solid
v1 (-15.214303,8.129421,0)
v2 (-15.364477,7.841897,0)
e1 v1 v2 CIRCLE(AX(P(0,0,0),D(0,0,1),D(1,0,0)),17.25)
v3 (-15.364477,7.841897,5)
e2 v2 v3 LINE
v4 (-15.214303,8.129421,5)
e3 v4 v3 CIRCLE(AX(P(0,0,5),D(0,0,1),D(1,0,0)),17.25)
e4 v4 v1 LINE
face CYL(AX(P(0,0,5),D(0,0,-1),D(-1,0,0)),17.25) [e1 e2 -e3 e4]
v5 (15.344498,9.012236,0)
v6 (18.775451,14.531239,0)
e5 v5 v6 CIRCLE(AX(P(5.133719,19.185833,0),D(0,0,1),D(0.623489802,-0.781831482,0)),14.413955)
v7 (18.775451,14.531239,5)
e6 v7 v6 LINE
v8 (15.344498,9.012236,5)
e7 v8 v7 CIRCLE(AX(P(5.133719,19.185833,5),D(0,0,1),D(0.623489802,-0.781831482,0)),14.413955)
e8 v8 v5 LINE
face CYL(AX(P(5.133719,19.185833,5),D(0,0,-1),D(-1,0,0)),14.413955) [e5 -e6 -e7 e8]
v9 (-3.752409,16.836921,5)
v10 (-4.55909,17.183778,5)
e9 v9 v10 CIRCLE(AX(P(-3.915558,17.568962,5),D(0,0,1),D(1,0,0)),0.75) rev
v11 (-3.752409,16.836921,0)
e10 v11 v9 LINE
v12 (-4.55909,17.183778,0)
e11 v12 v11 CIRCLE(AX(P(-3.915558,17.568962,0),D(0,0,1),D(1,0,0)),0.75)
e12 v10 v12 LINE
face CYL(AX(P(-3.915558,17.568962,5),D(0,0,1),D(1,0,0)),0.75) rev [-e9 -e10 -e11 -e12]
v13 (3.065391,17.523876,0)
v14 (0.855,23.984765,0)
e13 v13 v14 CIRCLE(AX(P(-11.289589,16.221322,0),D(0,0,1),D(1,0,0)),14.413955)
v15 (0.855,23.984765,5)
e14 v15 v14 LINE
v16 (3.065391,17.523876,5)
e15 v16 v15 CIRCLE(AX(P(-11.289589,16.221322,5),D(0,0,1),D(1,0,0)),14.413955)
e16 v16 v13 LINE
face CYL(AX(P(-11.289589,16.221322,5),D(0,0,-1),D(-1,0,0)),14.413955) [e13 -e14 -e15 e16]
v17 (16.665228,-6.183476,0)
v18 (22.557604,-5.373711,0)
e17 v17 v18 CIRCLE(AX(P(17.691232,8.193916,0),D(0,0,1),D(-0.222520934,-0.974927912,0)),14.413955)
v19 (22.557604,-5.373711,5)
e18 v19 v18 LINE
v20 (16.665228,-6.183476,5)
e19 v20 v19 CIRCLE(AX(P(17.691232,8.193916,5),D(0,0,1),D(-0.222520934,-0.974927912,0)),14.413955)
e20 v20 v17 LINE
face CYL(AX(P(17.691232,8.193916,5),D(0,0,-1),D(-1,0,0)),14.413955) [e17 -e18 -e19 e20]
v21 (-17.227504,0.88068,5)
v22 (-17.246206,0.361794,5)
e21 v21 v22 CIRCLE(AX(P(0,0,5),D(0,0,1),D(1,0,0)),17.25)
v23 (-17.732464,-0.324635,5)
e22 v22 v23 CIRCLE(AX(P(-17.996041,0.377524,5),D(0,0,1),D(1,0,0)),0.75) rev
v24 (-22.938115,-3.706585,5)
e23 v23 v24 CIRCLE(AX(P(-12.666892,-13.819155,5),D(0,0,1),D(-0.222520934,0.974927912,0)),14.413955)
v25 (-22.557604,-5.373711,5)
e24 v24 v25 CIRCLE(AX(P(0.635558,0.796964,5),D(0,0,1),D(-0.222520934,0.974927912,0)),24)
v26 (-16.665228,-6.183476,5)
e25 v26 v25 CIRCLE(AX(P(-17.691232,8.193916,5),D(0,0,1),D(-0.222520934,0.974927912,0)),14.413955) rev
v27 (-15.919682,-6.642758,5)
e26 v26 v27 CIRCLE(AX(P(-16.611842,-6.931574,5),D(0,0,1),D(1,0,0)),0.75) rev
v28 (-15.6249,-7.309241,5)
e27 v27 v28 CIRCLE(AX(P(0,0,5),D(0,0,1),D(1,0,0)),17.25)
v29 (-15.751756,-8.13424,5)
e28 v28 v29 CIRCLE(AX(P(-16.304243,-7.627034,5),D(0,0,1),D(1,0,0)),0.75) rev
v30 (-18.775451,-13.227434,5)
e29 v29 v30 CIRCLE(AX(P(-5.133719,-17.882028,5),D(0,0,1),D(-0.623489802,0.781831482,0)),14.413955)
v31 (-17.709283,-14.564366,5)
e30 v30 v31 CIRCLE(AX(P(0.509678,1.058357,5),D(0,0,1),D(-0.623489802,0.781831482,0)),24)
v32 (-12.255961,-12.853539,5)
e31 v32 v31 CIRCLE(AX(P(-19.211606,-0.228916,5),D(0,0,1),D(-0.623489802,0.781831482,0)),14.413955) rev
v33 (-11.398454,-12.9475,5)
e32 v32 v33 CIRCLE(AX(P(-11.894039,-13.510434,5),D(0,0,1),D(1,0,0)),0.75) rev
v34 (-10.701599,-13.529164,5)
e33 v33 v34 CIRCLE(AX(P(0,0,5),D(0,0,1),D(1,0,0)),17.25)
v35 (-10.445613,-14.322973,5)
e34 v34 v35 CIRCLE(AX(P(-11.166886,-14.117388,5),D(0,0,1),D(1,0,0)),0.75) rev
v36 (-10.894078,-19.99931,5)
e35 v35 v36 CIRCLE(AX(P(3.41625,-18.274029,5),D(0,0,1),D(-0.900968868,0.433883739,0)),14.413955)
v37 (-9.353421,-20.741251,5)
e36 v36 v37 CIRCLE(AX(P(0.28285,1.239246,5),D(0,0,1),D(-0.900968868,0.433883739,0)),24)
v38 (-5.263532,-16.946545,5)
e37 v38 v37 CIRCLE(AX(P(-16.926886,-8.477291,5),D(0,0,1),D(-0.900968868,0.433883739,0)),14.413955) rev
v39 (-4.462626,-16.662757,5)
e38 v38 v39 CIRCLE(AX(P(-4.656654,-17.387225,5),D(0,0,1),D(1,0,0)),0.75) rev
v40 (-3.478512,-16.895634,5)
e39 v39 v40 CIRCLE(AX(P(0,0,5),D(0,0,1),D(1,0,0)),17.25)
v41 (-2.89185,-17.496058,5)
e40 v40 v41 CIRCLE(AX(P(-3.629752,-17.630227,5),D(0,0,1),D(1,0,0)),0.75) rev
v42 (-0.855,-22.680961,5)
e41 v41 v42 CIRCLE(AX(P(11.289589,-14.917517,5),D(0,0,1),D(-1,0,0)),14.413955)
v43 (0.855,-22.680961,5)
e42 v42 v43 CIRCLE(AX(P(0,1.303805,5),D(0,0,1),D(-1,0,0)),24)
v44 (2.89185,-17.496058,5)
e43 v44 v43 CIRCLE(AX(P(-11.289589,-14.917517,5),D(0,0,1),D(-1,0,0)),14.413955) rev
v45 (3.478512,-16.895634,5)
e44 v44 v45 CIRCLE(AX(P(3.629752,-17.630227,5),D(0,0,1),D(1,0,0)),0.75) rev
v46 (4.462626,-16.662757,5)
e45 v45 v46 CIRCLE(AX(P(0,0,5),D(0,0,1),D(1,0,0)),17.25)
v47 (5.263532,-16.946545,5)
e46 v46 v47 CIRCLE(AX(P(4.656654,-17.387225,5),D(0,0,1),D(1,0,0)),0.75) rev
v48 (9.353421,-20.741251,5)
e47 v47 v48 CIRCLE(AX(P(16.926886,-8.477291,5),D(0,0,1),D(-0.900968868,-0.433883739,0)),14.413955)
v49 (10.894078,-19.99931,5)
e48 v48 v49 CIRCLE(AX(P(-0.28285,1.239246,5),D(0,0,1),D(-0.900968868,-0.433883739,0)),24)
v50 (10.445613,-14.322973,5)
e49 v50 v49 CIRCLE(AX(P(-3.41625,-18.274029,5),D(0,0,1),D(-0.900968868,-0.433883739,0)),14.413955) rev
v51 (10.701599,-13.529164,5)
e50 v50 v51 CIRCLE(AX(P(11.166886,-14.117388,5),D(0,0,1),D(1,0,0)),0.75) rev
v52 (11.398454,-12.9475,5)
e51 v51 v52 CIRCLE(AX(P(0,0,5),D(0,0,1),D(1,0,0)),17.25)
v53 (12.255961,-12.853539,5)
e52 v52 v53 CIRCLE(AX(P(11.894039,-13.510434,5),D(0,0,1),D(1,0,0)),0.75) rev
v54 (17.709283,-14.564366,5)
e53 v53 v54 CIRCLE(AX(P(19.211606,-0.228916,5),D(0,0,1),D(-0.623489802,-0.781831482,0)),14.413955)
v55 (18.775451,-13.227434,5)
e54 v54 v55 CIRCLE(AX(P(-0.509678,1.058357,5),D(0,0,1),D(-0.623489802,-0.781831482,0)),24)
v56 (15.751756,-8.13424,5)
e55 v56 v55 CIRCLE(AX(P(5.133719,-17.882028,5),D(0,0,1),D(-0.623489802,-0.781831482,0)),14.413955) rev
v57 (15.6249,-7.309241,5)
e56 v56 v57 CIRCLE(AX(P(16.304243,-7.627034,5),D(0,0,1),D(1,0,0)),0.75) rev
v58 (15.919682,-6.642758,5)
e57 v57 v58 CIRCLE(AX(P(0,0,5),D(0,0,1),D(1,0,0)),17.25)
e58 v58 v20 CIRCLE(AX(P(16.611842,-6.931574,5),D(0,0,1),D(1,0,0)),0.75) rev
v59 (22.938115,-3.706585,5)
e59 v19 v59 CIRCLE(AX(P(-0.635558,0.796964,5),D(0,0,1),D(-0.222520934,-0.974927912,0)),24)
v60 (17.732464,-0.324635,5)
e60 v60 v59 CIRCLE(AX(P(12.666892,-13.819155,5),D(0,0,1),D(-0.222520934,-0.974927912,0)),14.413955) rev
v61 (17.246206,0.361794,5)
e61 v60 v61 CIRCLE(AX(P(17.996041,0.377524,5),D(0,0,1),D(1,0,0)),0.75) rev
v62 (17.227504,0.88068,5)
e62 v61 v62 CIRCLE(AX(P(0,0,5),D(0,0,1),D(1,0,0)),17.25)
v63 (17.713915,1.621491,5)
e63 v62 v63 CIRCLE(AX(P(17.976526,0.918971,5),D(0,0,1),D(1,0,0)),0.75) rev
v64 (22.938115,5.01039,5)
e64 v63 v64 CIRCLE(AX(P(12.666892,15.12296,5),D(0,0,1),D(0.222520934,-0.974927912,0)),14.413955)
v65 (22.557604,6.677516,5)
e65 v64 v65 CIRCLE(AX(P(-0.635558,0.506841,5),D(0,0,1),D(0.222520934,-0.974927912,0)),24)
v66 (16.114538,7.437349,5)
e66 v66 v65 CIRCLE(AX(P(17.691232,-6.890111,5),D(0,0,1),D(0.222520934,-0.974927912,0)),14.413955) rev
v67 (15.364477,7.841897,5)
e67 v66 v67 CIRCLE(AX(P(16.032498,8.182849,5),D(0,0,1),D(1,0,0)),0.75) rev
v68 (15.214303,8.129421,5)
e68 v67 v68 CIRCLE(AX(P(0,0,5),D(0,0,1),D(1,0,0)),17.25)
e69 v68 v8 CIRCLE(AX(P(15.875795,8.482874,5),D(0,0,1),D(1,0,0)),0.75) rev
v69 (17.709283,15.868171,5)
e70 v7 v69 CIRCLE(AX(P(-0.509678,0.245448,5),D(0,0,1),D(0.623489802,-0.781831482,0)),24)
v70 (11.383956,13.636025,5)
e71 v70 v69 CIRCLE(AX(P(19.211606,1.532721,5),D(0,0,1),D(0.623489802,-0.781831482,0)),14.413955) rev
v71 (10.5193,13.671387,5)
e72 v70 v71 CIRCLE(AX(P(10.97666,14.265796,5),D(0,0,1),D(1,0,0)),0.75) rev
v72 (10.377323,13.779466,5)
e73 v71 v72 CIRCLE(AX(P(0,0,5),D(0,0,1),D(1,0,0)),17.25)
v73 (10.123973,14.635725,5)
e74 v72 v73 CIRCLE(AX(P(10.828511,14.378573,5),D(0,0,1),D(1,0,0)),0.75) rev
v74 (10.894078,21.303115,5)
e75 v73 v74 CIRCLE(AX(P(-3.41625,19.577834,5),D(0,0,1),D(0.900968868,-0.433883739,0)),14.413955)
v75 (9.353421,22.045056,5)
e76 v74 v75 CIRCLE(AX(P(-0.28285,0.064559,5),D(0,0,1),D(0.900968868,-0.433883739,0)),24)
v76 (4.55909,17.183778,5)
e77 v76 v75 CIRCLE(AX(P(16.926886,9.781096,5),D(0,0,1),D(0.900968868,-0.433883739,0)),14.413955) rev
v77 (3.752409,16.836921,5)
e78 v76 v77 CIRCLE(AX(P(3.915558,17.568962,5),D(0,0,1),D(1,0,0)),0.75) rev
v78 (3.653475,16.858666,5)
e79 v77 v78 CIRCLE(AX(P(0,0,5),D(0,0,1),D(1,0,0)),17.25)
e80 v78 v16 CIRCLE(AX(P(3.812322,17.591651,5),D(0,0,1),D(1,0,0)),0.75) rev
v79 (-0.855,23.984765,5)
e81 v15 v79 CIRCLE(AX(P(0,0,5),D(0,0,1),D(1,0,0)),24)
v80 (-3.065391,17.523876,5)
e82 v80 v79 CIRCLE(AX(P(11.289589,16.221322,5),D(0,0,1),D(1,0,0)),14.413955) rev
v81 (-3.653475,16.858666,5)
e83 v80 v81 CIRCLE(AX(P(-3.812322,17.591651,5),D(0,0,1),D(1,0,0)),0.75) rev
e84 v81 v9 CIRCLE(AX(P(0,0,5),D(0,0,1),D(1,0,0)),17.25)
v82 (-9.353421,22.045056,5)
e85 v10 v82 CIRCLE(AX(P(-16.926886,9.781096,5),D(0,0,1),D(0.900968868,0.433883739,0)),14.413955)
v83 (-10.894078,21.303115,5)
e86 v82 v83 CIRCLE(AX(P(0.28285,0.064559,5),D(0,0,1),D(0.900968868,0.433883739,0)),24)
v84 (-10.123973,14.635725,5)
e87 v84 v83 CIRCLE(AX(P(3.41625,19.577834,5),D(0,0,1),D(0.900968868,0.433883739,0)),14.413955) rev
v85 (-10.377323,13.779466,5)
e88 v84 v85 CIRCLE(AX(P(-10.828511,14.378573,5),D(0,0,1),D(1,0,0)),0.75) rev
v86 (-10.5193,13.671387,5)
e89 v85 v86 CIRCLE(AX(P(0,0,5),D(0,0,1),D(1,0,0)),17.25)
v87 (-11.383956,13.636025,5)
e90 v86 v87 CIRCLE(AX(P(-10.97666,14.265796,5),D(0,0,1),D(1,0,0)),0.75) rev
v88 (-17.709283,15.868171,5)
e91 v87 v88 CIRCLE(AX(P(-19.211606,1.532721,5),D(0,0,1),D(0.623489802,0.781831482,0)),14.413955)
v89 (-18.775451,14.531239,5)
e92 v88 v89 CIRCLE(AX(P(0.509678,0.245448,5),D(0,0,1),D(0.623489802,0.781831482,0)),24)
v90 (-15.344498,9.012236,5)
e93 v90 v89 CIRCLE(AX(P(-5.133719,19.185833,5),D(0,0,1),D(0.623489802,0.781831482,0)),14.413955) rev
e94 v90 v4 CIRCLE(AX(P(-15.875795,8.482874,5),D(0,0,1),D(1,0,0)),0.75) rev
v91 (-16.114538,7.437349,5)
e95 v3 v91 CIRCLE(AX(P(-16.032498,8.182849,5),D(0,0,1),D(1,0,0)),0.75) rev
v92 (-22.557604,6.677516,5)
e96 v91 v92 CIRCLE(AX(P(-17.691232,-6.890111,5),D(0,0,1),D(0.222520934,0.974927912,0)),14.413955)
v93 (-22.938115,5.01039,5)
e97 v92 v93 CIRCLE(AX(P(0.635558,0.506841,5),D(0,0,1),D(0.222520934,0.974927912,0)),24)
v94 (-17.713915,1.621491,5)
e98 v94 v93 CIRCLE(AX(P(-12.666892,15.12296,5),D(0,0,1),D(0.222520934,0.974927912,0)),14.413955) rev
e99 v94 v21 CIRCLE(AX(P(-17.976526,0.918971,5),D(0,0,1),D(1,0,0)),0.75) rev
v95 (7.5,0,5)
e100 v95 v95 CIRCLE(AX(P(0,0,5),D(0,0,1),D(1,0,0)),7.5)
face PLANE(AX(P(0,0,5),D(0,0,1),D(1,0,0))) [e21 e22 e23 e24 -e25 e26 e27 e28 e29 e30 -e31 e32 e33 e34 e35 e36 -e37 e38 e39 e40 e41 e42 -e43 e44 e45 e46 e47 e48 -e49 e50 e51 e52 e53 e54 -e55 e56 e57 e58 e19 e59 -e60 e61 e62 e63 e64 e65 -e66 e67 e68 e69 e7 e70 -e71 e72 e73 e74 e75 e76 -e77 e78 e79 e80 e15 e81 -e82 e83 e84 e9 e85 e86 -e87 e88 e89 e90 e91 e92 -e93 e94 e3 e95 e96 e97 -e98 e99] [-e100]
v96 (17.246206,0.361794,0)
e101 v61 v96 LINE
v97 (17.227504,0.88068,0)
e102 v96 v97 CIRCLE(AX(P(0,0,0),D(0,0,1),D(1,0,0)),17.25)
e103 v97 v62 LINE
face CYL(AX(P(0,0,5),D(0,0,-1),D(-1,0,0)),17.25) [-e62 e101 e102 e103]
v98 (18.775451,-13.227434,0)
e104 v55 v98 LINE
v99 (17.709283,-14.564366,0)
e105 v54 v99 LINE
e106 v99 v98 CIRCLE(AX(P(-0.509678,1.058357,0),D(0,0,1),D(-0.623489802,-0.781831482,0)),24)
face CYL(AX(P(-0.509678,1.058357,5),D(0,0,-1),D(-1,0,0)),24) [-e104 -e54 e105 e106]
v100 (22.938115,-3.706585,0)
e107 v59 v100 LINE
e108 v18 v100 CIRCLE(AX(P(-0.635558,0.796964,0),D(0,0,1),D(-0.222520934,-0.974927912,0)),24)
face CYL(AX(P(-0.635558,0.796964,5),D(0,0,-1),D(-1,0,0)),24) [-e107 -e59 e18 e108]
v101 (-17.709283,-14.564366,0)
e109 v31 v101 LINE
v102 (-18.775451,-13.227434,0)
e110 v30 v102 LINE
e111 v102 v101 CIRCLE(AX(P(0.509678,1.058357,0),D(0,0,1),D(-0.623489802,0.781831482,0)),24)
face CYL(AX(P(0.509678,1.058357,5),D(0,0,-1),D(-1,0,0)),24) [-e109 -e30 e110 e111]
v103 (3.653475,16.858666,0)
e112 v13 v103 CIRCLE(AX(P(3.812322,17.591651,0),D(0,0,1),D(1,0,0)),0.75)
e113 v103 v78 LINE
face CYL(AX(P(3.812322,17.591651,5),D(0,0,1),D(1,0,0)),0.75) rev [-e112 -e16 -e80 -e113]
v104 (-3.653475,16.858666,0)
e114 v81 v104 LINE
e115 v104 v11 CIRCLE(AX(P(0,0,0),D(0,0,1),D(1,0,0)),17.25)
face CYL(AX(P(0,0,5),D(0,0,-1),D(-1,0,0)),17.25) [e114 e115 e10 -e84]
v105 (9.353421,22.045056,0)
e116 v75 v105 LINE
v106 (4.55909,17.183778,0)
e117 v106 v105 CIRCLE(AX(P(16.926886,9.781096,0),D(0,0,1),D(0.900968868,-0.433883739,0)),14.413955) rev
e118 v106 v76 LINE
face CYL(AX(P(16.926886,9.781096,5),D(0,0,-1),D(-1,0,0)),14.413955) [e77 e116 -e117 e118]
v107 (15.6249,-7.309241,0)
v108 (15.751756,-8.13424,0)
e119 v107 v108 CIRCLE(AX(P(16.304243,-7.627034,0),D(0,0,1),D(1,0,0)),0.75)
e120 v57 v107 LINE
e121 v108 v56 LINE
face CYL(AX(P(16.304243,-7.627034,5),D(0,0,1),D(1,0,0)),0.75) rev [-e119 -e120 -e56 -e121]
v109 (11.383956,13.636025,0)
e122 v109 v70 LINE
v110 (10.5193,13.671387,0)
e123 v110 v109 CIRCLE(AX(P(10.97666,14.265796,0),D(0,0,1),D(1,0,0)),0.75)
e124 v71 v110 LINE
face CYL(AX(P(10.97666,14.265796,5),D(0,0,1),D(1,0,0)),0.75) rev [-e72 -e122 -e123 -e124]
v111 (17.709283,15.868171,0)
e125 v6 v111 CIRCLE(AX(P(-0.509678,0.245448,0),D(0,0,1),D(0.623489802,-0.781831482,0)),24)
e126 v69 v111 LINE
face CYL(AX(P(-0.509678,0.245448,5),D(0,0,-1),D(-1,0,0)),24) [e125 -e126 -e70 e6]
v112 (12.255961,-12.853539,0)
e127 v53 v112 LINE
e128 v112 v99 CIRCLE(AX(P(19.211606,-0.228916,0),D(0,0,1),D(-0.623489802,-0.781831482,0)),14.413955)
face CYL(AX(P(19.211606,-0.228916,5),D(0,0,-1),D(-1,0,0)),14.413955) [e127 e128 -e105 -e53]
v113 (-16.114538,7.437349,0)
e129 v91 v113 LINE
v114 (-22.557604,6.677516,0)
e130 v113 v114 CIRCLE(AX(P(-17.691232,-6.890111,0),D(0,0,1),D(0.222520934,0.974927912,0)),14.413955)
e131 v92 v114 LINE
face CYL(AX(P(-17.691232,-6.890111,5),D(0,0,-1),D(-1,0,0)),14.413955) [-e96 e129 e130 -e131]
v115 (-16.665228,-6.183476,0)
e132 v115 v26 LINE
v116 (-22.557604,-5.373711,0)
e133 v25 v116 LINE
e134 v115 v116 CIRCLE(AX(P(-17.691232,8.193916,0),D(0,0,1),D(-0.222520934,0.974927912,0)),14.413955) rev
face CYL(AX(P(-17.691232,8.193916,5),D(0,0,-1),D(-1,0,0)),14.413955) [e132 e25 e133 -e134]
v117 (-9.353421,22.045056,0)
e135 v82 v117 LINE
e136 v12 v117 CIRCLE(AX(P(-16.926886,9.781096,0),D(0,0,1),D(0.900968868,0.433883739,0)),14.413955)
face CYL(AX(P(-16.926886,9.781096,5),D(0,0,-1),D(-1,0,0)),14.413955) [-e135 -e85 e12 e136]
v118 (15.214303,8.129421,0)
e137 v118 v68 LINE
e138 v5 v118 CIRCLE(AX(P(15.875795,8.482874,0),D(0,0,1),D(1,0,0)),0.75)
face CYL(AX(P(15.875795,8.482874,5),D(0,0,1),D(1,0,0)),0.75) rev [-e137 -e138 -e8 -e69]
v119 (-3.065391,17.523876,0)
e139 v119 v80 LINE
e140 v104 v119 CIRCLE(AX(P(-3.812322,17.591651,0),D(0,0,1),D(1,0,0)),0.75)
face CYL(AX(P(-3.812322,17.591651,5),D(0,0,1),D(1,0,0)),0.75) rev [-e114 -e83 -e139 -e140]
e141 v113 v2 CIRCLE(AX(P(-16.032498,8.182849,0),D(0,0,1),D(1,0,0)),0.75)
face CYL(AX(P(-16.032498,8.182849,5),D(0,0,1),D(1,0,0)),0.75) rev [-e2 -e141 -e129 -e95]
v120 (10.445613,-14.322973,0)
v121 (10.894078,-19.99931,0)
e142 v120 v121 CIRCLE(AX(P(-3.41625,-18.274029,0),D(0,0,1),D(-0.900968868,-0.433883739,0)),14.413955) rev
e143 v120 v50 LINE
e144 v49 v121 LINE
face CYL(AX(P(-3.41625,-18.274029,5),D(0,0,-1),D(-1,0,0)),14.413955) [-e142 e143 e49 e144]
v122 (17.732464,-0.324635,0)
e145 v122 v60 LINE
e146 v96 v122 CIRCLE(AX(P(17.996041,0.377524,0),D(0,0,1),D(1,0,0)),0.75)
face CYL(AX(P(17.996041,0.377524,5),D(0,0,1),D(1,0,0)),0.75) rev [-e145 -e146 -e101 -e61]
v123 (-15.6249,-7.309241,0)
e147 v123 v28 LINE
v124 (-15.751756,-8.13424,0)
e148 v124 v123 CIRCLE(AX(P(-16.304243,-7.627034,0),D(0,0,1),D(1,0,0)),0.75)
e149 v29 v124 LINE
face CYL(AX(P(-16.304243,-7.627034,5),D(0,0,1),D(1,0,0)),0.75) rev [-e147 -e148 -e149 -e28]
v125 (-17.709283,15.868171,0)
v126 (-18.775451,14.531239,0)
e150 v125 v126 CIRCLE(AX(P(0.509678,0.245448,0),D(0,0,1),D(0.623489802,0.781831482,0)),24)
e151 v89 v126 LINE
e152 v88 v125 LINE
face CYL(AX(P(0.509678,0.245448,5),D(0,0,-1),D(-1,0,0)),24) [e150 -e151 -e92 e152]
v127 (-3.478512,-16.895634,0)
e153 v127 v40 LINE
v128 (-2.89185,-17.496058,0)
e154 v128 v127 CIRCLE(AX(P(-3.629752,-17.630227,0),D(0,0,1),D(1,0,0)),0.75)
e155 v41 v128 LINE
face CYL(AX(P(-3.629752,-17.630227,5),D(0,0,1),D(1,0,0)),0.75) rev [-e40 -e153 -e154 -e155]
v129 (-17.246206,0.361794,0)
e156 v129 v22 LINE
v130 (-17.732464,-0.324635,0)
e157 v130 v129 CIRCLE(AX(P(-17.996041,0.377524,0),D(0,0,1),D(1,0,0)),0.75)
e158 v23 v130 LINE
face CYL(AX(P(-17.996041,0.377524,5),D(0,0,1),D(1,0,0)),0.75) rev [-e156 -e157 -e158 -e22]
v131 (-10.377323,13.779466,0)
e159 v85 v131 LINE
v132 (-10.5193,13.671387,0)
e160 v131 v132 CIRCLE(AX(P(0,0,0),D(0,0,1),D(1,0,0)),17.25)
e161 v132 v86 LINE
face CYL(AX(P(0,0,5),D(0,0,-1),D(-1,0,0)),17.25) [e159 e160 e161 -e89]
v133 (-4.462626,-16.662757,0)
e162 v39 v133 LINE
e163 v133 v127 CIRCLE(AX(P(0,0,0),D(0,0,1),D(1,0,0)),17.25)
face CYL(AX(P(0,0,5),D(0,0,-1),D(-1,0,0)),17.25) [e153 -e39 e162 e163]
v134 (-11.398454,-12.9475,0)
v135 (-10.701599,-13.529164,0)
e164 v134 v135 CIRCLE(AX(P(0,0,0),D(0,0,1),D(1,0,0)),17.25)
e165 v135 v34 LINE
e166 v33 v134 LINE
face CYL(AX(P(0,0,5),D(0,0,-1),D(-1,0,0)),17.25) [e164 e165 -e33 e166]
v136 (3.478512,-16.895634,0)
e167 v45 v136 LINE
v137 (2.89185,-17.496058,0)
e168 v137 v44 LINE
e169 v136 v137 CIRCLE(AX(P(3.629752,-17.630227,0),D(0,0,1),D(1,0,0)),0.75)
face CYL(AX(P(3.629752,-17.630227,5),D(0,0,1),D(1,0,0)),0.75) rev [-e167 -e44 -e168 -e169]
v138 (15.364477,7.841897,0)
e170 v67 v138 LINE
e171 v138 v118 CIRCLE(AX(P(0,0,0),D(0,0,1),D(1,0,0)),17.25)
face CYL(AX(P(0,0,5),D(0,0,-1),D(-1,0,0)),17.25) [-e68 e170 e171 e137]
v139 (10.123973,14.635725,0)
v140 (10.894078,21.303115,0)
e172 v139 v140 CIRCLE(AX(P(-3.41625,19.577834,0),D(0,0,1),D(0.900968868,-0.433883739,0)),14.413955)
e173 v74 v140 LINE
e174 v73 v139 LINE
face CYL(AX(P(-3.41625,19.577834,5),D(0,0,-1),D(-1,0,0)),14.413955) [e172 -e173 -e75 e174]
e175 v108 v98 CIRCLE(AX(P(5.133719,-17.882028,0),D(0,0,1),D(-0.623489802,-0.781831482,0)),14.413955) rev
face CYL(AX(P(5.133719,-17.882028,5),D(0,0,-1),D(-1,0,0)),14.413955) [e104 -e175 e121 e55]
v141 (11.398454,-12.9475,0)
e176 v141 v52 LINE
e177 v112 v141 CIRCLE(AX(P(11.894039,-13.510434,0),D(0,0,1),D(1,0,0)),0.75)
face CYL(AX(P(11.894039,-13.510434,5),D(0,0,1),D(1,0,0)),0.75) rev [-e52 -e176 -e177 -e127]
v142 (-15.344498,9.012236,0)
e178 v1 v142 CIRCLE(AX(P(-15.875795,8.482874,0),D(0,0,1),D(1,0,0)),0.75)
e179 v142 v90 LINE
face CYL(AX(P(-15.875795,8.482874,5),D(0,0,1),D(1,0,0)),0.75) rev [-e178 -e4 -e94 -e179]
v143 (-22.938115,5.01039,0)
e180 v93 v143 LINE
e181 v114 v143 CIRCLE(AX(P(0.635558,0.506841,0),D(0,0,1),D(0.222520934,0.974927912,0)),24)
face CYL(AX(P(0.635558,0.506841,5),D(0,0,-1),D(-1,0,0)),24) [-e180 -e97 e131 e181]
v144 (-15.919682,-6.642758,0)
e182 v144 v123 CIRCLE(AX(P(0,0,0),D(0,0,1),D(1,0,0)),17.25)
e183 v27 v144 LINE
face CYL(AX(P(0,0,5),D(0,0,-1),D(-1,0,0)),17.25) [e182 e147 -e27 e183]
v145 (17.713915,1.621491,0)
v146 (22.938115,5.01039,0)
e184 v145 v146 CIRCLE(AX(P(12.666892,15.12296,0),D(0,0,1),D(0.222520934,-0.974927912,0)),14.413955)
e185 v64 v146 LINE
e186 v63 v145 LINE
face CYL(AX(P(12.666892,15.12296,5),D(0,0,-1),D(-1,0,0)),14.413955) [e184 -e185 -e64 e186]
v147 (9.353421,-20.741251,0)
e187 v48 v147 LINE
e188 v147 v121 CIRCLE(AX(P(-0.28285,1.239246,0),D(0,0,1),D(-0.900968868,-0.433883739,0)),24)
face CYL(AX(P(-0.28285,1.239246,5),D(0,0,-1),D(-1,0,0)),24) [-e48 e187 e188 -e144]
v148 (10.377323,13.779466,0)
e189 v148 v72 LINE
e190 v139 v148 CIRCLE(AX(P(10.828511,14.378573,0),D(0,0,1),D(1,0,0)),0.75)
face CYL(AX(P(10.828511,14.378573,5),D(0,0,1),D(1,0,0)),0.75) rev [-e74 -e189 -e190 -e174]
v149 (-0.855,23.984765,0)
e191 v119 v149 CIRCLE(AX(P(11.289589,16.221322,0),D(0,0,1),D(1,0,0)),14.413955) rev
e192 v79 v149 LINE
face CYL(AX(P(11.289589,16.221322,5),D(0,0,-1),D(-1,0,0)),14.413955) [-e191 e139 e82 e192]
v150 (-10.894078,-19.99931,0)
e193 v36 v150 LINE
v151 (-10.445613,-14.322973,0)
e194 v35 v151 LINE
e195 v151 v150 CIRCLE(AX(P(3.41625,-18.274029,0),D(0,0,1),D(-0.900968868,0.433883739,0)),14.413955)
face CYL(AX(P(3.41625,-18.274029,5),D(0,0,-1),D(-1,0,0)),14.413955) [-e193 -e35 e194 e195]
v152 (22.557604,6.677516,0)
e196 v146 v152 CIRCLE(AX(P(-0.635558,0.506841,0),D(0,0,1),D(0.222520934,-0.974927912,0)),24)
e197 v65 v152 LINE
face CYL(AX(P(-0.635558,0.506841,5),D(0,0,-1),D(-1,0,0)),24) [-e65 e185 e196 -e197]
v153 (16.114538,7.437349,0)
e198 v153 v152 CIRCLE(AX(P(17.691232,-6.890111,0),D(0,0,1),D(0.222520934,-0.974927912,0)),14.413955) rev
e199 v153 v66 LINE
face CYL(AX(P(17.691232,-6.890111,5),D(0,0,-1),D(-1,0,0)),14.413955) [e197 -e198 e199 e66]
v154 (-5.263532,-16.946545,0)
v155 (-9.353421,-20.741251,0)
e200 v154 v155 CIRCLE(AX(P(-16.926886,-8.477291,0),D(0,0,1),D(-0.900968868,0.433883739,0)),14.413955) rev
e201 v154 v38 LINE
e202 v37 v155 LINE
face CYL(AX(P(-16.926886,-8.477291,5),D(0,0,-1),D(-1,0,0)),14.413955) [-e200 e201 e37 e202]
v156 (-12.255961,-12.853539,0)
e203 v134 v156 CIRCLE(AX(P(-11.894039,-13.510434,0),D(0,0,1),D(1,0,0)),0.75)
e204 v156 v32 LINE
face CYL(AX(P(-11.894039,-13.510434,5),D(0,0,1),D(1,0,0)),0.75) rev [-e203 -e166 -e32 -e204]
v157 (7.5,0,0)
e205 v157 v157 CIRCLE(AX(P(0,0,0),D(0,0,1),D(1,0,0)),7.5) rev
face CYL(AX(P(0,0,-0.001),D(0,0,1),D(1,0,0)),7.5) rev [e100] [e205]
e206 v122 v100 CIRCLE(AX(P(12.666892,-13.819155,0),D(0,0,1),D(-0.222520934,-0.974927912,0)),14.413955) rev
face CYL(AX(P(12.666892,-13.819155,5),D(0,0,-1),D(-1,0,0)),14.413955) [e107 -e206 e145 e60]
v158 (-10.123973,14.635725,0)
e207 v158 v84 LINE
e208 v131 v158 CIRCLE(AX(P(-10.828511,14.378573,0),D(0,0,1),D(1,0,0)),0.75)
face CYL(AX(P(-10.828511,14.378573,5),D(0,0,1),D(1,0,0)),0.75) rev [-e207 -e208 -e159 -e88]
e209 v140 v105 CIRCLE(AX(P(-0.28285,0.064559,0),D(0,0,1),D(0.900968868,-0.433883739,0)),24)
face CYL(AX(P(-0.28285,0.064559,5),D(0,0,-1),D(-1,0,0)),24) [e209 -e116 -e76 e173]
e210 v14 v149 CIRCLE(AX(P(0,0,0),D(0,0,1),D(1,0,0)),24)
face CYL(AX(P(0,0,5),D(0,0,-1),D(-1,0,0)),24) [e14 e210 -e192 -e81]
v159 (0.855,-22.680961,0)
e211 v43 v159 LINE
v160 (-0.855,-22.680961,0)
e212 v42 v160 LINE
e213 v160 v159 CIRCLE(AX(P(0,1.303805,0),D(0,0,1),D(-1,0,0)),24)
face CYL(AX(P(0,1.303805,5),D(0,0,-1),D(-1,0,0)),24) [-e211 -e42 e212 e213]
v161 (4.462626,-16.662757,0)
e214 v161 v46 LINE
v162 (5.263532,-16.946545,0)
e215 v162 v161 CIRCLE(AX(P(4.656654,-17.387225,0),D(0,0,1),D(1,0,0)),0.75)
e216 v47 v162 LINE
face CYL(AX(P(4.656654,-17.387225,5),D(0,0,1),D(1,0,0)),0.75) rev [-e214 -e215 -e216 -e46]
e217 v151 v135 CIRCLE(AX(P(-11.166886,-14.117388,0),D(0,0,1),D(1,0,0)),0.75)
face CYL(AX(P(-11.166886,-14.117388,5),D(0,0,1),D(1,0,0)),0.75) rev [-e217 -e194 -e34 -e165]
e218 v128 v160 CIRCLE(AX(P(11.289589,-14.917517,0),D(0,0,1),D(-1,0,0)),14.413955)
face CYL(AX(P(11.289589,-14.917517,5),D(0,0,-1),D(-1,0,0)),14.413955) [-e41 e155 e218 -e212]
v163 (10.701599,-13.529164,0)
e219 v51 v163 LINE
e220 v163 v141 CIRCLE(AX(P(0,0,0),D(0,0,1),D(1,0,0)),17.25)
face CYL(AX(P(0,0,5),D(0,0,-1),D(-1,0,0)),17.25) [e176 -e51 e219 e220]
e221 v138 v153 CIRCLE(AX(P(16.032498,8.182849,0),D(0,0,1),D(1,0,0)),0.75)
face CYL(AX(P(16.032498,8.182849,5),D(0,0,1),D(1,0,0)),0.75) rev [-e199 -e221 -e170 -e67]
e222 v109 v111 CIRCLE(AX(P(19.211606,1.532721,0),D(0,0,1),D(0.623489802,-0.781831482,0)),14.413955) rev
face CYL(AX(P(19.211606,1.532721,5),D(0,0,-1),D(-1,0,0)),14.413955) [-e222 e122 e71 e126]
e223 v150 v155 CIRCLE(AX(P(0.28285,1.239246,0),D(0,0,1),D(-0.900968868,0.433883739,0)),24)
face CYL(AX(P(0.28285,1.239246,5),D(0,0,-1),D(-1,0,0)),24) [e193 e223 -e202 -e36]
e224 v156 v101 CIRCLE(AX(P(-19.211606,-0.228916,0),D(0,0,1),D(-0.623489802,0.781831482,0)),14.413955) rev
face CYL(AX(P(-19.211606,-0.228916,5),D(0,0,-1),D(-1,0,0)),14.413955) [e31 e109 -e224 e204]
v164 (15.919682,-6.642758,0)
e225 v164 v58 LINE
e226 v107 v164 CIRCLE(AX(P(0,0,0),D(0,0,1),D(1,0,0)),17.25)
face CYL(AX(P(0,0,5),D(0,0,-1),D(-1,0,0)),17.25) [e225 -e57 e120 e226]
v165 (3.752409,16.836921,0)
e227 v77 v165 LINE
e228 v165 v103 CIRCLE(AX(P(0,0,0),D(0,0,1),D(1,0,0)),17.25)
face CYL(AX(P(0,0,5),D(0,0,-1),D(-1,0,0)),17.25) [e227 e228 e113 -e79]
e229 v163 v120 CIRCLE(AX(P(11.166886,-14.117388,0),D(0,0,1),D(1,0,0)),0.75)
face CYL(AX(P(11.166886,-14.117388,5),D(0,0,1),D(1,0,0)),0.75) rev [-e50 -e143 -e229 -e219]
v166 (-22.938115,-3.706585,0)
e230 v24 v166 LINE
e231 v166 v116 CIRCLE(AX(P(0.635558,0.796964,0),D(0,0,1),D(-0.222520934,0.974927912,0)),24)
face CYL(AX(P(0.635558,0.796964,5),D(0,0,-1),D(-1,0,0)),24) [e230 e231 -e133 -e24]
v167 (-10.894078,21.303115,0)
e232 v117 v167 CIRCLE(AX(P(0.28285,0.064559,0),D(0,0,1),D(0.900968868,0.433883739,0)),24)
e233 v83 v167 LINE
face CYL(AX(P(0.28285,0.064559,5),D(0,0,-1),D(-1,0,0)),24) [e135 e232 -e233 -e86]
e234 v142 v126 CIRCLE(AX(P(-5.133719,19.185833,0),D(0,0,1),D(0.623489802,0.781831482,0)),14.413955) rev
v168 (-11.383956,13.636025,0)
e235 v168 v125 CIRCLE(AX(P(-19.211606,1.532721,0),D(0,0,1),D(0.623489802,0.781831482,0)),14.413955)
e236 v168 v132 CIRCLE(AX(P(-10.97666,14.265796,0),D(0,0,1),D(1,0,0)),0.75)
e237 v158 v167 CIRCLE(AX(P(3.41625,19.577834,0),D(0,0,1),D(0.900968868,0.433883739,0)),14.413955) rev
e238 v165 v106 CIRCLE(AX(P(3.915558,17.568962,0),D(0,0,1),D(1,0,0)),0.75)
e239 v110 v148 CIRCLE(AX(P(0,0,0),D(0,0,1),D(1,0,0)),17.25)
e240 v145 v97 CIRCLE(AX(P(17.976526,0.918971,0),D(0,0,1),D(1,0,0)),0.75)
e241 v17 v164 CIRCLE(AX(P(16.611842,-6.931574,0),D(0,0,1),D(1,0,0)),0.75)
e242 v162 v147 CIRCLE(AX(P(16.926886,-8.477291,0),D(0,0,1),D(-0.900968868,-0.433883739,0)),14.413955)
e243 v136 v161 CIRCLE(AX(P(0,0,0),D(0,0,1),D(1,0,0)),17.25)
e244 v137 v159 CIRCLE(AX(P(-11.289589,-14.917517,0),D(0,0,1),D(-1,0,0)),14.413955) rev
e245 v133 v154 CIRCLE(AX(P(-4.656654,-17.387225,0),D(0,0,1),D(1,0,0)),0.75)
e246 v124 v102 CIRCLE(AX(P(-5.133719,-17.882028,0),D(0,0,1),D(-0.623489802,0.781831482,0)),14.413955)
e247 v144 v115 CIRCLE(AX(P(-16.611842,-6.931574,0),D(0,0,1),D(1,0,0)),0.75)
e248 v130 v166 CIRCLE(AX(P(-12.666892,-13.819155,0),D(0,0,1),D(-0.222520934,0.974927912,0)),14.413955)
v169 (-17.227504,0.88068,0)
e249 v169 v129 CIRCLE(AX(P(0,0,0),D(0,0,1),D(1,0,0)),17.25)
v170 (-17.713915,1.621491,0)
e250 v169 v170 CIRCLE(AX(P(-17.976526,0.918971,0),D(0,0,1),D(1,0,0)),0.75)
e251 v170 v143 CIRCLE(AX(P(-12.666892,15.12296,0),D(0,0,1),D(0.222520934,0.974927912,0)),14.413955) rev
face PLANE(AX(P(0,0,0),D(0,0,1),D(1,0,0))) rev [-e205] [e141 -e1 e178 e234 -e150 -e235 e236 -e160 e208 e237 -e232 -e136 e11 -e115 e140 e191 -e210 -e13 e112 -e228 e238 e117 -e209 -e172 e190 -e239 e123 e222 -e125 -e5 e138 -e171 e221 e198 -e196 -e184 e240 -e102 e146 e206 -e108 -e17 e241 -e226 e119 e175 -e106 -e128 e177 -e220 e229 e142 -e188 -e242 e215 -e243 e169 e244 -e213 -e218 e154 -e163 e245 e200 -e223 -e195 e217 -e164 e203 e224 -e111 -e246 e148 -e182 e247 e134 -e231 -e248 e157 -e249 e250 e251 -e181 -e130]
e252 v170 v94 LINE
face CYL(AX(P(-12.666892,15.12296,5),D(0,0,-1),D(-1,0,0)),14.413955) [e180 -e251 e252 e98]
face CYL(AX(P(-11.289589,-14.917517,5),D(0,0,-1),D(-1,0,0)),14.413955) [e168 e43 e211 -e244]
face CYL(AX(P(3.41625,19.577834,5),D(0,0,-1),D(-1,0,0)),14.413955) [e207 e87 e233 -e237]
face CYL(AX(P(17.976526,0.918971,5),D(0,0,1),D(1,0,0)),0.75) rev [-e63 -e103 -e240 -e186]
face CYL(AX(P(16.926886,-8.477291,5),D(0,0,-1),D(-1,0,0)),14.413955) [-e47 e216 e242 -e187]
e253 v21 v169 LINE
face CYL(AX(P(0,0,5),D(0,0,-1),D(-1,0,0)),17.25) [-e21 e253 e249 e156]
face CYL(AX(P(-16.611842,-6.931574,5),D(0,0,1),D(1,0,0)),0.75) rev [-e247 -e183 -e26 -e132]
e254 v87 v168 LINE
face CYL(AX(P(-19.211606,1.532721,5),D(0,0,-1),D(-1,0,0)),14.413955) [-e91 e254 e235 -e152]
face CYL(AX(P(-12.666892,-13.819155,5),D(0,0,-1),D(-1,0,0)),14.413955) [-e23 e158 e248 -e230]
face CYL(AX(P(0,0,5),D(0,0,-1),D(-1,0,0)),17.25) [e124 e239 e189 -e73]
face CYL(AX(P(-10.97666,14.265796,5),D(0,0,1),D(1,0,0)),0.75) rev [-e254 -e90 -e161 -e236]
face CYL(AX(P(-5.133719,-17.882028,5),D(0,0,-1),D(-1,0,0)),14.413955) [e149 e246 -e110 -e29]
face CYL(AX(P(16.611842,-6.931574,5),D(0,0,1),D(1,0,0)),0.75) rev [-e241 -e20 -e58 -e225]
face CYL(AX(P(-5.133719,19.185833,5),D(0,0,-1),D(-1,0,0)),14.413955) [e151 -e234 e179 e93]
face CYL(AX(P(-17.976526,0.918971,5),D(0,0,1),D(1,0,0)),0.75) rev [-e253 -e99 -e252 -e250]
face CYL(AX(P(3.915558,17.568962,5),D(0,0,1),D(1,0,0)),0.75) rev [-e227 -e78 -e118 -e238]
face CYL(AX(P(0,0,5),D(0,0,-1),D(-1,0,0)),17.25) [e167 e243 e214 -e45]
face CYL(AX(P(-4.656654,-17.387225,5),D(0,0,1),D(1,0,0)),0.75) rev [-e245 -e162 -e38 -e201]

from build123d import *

# Parameters (mm, degrees)
SKETCH_1_R               = 17.25
EXTRUDE_1_DEPTH          = 5
EXTRUDE_2_DEPTH          = 5
FILLET_1_R               = 0.75
PATTERN_CIRCULAR_1_DEPTH = 5
CUT_EXTRUDE_2_REACH      = 35.573
SKETCH_2_R               = 7.5


# Read off the part's stored shape, not the designer's step: 원형 패턴1
with BuildPart() as part:
    # 스케치1 → 보스-돌출1 (new body)
    with BuildSketch(Plane.XY):
        Circle(SKETCH_1_R)
    extrude(amount=EXTRUDE_1_DEPTH)

    # 스케치1<3> → 보스-돌출2 (add)
    with BuildSketch(Plane.XY):
        with BuildLine():
            ThreePointArc((3.105, 16.968249026), (2.435929865, 20.62271117), (0.855, 23.984765477))
            ThreePointArc((0.855, 23.984765477), (0, 24), (-0.855, 23.984765477))
            ThreePointArc((-0.855, 23.984765477), (-2.435929865, 20.62271117), (-3.105, 16.968249026))
            ThreePointArc((-3.105, 16.968249026), (0, 17.25), (3.105, 16.968249026))
        make_face()
    extrude(amount=EXTRUDE_2_DEPTH)

    # 필렛1
    fillet_1_edges = [part.edges().sort_by_distance(p)[0] for p in [
        (-3.105, 16.968249026, 2.5),
        (3.105, 16.968249026, 2.5),
    ]]
    fillet(fillet_1_edges, radius=FILLET_1_R)

    # 원형 패턴1 outline → 원형 패턴1 (add)
    with BuildSketch(Plane.XY):
        with BuildLine():
            ThreePointArc((3.752409392, 16.836921446), (7.228370534, 15.662476159), (10.37732262, 13.77946571))
            ThreePointArc((10.37732262, 13.77946571), (10.109330299, 14.165782518), (10.123973341, 14.635725219))
            ThreePointArc((10.123973341, 14.635725219), (10.902507886, 17.923971687), (10.894078225, 21.303115042))
            ThreePointArc((10.894078225, 21.303115042), (10.130359855, 21.68781147), (9.353421461, 22.045056236))
            ThreePointArc((9.353421461, 22.045056236), (6.66426095, 19.902390957), (4.559090047, 17.183778404))
            ThreePointArc((4.559090047, 17.183778404), (4.211817106, 16.879954744), (3.752409392, 16.836921446))
        make_face()
        with BuildLine():
            ThreePointArc((10.519299619, 13.671387476), (13.161797978, 11.150317215), (15.214303094, 8.129420728))
            ThreePointArc((15.214303094, 8.129420728), (15.133819906, 8.592297997), (15.344497995, 9.012235673))
            ThreePointArc((15.344497995, 9.012235673), (17.375059394, 11.575860868), (18.775450651, 14.531238688))
            ThreePointArc((18.775450651, 14.531238688), (18.2542777, 15.209203175), (17.70928309, 15.868170523))
            ThreePointArc((17.70928309, 15.868170523), (14.414969994, 15.125158945), (11.38395589, 13.636025477))
            ThreePointArc((11.38395589, 13.636025477), (10.94601321, 13.516422059), (10.519299619, 13.671387476))
        make_face()
        with BuildLine():
            ThreePointArc((15.364476978, 7.841896914), (16.663551392, 4.459658622), (17.227504247, 0.880680084))
            ThreePointArc((17.227504247, 0.880680084), (17.349588602, 1.330612703), (17.713914892, 1.62149121))
            ThreePointArc((17.713914892, 1.62149121), (20.511209748, 3.030450816), (22.938114809, 5.010389578))
            ThreePointArc((22.938114809, 5.010389578), (22.762711972, 5.847342943), (22.557604012, 6.677516308))
            ThreePointArc((22.557604012, 6.677516308), (19.379376386, 7.424645609), (16.1145377, 7.437349496))
            ThreePointArc((16.1145377, 7.437349496), (15.676466798, 7.522741397), (15.364476978, 7.841896914))
        make_face()
        with BuildLine():
            ThreePointArc((17.246205523, 0.361794236), (16.948744989, -3.209757512), (15.919681663, -6.642758143))
            ThreePointArc((15.919681663, -6.642758143), (16.218467781, -6.293015235), (16.665227716, -6.183476169))
            ThreePointArc((16.665227716, -6.183476169), (19.653637621, -6.085826774), (22.557604012, -5.373711355))
            ThreePointArc((22.557604012, -5.373711355), (22.762711972, -4.543537991), (22.938114809, -3.706584626))
            ThreePointArc((22.938114809, -3.706584626), (20.519516774, -1.732038623), (17.732464097, -0.324634719))
            ThreePointArc((17.732464097, -0.324634719), (17.384038193, -0.056011184), (17.246205523, 0.361794236))
        make_face()
        with BuildLine():
            ThreePointArc((15.624899975, -7.30924078), (13.802641251, -10.346477396), (11.398453982, -12.947499636))
            ThreePointArc((11.398453982, -12.947499636), (11.812346904, -12.764896736), (12.255961374, -12.853538558))
            ThreePointArc((12.255961374, -12.853538558), (14.896975546, -13.981953909), (17.70928309, -14.56436557))
            ThreePointArc((17.70928309, -14.56436557), (18.2542777, -13.905398222), (18.775450651, -13.227433735))
            ThreePointArc((18.775450651, -13.227433735), (17.528042353, -10.523846266), (15.751756091, -8.13423965))
            ThreePointArc((15.751756091, -8.13423965), (15.562955662, -7.741018123), (15.624899975, -7.30924078))
        make_face()
        with BuildLine():
            ThreePointArc((10.701599161, -13.529163884), (7.742304938, -15.414902343), (4.462626447, -16.662756831))
            ThreePointArc((4.462626447, -16.662756831), (4.907143939, -16.680291261), (5.263531943, -16.946544614))
            ThreePointArc((5.263531943, -16.946544614), (7.123124119, -19.043668749), (9.353421461, -20.741251283))
            ThreePointArc((9.353421461, -20.741251283), (10.130359855, -20.384006517), (10.894078225, -19.99931009))
            ThreePointArc((10.894078225, -19.99931009), (10.952928458, -17.13877644), (10.445613014, -14.322973331))
            ThreePointArc((10.445613014, -14.322973331), (10.45308323, -13.887202628), (10.701599161, -13.529163884))
        make_face()
        with BuildLine():
            ThreePointArc((3.478512175, -16.895634142), (0, -17.25), (-3.478512175, -16.895634142))
            ThreePointArc((-3.478512175, -16.895634142), (-3.093309657, -17.106080205), (-2.891850292, -17.496057961))
            ThreePointArc((-2.891850292, -17.496057961), (-2.126287606, -20.187844374), (-0.855, -22.680960525))
            ThreePointArc((-0.855, -22.680960525), (0, -22.696195047), (0.855, -22.680960525))
            ThreePointArc((0.855, -22.680960525), (2.126287606, -20.187844374), (2.891850292, -17.496057961))
            ThreePointArc((2.891850292, -17.496057961), (3.093309657, -17.106080205), (3.478512175, -16.895634142))
        make_face()
        with BuildLine():
            ThreePointArc((-4.462626447, -16.662756831), (-7.742304938, -15.414902343), (-10.701599161, -13.529163884))
            ThreePointArc((-10.701599161, -13.529163884), (-10.45308323, -13.887202628), (-10.445613014, -14.322973331))
            ThreePointArc((-10.445613014, -14.322973331), (-10.952928458, -17.13877644), (-10.894078225, -19.99931009))
            ThreePointArc((-10.894078225, -19.99931009), (-10.130359855, -20.384006517), (-9.353421461, -20.741251283))
            ThreePointArc((-9.353421461, -20.741251283), (-7.123124119, -19.043668749), (-5.263531943, -16.946544614))
            ThreePointArc((-5.263531943, -16.946544614), (-4.907143939, -16.680291261), (-4.462626447, -16.662756831))
        make_face()
        with BuildLine():
            ThreePointArc((-11.398453982, -12.947499636), (-13.802641251, -10.346477396), (-15.624899975, -7.30924078))
            ThreePointArc((-15.624899975, -7.30924078), (-15.562955662, -7.741018123), (-15.751756091, -8.13423965))
            ThreePointArc((-15.751756091, -8.13423965), (-17.528042353, -10.523846266), (-18.775450651, -13.227433735))
            ThreePointArc((-18.775450651, -13.227433735), (-18.2542777, -13.905398222), (-17.70928309, -14.56436557))
            ThreePointArc((-17.70928309, -14.56436557), (-14.896975546, -13.981953909), (-12.255961374, -12.853538558))
            ThreePointArc((-12.255961374, -12.853538558), (-11.812346904, -12.764896736), (-11.398453982, -12.947499636))
        make_face()
        with BuildLine():
            ThreePointArc((-15.919681663, -6.642758143), (-16.948744989, -3.209757512), (-17.246205523, 0.361794236))
            ThreePointArc((-17.246205523, 0.361794236), (-17.384038193, -0.056011184), (-17.732464097, -0.324634719))
            ThreePointArc((-17.732464097, -0.324634719), (-20.519516774, -1.732038623), (-22.938114809, -3.706584626))
            ThreePointArc((-22.938114809, -3.706584626), (-22.762711972, -4.543537991), (-22.557604012, -5.373711355))
            ThreePointArc((-22.557604012, -5.373711355), (-19.653637621, -6.085826774), (-16.665227716, -6.183476169))
            ThreePointArc((-16.665227716, -6.183476169), (-16.218467781, -6.293015235), (-15.919681663, -6.642758143))
        make_face()
        with BuildLine():
            ThreePointArc((-17.227504247, 0.880680084), (-16.663551392, 4.459658622), (-15.364476978, 7.841896914))
            ThreePointArc((-15.364476978, 7.841896914), (-15.676466798, 7.522741397), (-16.1145377, 7.437349496))
            ThreePointArc((-16.1145377, 7.437349496), (-19.379376386, 7.424645609), (-22.557604012, 6.677516308))
            ThreePointArc((-22.557604012, 6.677516308), (-22.762711972, 5.847342943), (-22.938114809, 5.010389578))
            ThreePointArc((-22.938114809, 5.010389578), (-20.511209748, 3.030450816), (-17.713914892, 1.62149121))
            ThreePointArc((-17.713914892, 1.62149121), (-17.349588602, 1.330612703), (-17.227504247, 0.880680084))
        make_face()
        with BuildLine():
            ThreePointArc((-15.214303094, 8.129420728), (-13.161797978, 11.150317215), (-10.519299619, 13.671387476))
            ThreePointArc((-10.519299619, 13.671387476), (-10.94601321, 13.516422059), (-11.38395589, 13.636025477))
            ThreePointArc((-11.38395589, 13.636025477), (-14.414969994, 15.125158945), (-17.70928309, 15.868170523))
            ThreePointArc((-17.70928309, 15.868170523), (-18.2542777, 15.209203175), (-18.775450651, 14.531238688))
            ThreePointArc((-18.775450651, 14.531238688), (-17.375059394, 11.575860868), (-15.344497995, 9.012235673))
            ThreePointArc((-15.344497995, 9.012235673), (-15.133819906, 8.592297997), (-15.214303094, 8.129420728))
        make_face()
        with BuildLine():
            ThreePointArc((-4.559090047, 17.183778404), (-6.66426095, 19.902390957), (-9.353421461, 22.045056236))
            ThreePointArc((-9.353421461, 22.045056236), (-10.130359855, 21.68781147), (-10.894078225, 21.303115042))
            ThreePointArc((-10.894078225, 21.303115042), (-10.902507886, 17.923971687), (-10.123973341, 14.635725219))
            ThreePointArc((-10.123973341, 14.635725219), (-10.109330299, 14.165782518), (-10.37732262, 13.77946571))
            ThreePointArc((-10.37732262, 13.77946571), (-7.228370534, 15.662476159), (-3.752409392, 16.836921446))
            ThreePointArc((-3.752409392, 16.836921446), (-4.211817106, 16.879954744), (-4.559090047, 17.183778404))
        make_face()
    extrude(amount=PATTERN_CIRCULAR_1_DEPTH)

    # 스케치2 → 컷-돌출2 (cut, up to next)
    with BuildSketch(Plane.XY.offset(5), mode=Mode.PRIVATE) as cut_extrude_2_sk1:
        Circle(SKETCH_2_R)
    cut_extrude_2_tool1 = extrude(cut_extrude_2_sk1.sketch, amount=-CUT_EXTRUDE_2_REACH, mode=Mode.PRIVATE) & part.part
    add(cut_extrude_2_tool1.solids().sort_by_distance((0, 0, 5))[0], mode=Mode.SUBTRACT)


solid = part.part
